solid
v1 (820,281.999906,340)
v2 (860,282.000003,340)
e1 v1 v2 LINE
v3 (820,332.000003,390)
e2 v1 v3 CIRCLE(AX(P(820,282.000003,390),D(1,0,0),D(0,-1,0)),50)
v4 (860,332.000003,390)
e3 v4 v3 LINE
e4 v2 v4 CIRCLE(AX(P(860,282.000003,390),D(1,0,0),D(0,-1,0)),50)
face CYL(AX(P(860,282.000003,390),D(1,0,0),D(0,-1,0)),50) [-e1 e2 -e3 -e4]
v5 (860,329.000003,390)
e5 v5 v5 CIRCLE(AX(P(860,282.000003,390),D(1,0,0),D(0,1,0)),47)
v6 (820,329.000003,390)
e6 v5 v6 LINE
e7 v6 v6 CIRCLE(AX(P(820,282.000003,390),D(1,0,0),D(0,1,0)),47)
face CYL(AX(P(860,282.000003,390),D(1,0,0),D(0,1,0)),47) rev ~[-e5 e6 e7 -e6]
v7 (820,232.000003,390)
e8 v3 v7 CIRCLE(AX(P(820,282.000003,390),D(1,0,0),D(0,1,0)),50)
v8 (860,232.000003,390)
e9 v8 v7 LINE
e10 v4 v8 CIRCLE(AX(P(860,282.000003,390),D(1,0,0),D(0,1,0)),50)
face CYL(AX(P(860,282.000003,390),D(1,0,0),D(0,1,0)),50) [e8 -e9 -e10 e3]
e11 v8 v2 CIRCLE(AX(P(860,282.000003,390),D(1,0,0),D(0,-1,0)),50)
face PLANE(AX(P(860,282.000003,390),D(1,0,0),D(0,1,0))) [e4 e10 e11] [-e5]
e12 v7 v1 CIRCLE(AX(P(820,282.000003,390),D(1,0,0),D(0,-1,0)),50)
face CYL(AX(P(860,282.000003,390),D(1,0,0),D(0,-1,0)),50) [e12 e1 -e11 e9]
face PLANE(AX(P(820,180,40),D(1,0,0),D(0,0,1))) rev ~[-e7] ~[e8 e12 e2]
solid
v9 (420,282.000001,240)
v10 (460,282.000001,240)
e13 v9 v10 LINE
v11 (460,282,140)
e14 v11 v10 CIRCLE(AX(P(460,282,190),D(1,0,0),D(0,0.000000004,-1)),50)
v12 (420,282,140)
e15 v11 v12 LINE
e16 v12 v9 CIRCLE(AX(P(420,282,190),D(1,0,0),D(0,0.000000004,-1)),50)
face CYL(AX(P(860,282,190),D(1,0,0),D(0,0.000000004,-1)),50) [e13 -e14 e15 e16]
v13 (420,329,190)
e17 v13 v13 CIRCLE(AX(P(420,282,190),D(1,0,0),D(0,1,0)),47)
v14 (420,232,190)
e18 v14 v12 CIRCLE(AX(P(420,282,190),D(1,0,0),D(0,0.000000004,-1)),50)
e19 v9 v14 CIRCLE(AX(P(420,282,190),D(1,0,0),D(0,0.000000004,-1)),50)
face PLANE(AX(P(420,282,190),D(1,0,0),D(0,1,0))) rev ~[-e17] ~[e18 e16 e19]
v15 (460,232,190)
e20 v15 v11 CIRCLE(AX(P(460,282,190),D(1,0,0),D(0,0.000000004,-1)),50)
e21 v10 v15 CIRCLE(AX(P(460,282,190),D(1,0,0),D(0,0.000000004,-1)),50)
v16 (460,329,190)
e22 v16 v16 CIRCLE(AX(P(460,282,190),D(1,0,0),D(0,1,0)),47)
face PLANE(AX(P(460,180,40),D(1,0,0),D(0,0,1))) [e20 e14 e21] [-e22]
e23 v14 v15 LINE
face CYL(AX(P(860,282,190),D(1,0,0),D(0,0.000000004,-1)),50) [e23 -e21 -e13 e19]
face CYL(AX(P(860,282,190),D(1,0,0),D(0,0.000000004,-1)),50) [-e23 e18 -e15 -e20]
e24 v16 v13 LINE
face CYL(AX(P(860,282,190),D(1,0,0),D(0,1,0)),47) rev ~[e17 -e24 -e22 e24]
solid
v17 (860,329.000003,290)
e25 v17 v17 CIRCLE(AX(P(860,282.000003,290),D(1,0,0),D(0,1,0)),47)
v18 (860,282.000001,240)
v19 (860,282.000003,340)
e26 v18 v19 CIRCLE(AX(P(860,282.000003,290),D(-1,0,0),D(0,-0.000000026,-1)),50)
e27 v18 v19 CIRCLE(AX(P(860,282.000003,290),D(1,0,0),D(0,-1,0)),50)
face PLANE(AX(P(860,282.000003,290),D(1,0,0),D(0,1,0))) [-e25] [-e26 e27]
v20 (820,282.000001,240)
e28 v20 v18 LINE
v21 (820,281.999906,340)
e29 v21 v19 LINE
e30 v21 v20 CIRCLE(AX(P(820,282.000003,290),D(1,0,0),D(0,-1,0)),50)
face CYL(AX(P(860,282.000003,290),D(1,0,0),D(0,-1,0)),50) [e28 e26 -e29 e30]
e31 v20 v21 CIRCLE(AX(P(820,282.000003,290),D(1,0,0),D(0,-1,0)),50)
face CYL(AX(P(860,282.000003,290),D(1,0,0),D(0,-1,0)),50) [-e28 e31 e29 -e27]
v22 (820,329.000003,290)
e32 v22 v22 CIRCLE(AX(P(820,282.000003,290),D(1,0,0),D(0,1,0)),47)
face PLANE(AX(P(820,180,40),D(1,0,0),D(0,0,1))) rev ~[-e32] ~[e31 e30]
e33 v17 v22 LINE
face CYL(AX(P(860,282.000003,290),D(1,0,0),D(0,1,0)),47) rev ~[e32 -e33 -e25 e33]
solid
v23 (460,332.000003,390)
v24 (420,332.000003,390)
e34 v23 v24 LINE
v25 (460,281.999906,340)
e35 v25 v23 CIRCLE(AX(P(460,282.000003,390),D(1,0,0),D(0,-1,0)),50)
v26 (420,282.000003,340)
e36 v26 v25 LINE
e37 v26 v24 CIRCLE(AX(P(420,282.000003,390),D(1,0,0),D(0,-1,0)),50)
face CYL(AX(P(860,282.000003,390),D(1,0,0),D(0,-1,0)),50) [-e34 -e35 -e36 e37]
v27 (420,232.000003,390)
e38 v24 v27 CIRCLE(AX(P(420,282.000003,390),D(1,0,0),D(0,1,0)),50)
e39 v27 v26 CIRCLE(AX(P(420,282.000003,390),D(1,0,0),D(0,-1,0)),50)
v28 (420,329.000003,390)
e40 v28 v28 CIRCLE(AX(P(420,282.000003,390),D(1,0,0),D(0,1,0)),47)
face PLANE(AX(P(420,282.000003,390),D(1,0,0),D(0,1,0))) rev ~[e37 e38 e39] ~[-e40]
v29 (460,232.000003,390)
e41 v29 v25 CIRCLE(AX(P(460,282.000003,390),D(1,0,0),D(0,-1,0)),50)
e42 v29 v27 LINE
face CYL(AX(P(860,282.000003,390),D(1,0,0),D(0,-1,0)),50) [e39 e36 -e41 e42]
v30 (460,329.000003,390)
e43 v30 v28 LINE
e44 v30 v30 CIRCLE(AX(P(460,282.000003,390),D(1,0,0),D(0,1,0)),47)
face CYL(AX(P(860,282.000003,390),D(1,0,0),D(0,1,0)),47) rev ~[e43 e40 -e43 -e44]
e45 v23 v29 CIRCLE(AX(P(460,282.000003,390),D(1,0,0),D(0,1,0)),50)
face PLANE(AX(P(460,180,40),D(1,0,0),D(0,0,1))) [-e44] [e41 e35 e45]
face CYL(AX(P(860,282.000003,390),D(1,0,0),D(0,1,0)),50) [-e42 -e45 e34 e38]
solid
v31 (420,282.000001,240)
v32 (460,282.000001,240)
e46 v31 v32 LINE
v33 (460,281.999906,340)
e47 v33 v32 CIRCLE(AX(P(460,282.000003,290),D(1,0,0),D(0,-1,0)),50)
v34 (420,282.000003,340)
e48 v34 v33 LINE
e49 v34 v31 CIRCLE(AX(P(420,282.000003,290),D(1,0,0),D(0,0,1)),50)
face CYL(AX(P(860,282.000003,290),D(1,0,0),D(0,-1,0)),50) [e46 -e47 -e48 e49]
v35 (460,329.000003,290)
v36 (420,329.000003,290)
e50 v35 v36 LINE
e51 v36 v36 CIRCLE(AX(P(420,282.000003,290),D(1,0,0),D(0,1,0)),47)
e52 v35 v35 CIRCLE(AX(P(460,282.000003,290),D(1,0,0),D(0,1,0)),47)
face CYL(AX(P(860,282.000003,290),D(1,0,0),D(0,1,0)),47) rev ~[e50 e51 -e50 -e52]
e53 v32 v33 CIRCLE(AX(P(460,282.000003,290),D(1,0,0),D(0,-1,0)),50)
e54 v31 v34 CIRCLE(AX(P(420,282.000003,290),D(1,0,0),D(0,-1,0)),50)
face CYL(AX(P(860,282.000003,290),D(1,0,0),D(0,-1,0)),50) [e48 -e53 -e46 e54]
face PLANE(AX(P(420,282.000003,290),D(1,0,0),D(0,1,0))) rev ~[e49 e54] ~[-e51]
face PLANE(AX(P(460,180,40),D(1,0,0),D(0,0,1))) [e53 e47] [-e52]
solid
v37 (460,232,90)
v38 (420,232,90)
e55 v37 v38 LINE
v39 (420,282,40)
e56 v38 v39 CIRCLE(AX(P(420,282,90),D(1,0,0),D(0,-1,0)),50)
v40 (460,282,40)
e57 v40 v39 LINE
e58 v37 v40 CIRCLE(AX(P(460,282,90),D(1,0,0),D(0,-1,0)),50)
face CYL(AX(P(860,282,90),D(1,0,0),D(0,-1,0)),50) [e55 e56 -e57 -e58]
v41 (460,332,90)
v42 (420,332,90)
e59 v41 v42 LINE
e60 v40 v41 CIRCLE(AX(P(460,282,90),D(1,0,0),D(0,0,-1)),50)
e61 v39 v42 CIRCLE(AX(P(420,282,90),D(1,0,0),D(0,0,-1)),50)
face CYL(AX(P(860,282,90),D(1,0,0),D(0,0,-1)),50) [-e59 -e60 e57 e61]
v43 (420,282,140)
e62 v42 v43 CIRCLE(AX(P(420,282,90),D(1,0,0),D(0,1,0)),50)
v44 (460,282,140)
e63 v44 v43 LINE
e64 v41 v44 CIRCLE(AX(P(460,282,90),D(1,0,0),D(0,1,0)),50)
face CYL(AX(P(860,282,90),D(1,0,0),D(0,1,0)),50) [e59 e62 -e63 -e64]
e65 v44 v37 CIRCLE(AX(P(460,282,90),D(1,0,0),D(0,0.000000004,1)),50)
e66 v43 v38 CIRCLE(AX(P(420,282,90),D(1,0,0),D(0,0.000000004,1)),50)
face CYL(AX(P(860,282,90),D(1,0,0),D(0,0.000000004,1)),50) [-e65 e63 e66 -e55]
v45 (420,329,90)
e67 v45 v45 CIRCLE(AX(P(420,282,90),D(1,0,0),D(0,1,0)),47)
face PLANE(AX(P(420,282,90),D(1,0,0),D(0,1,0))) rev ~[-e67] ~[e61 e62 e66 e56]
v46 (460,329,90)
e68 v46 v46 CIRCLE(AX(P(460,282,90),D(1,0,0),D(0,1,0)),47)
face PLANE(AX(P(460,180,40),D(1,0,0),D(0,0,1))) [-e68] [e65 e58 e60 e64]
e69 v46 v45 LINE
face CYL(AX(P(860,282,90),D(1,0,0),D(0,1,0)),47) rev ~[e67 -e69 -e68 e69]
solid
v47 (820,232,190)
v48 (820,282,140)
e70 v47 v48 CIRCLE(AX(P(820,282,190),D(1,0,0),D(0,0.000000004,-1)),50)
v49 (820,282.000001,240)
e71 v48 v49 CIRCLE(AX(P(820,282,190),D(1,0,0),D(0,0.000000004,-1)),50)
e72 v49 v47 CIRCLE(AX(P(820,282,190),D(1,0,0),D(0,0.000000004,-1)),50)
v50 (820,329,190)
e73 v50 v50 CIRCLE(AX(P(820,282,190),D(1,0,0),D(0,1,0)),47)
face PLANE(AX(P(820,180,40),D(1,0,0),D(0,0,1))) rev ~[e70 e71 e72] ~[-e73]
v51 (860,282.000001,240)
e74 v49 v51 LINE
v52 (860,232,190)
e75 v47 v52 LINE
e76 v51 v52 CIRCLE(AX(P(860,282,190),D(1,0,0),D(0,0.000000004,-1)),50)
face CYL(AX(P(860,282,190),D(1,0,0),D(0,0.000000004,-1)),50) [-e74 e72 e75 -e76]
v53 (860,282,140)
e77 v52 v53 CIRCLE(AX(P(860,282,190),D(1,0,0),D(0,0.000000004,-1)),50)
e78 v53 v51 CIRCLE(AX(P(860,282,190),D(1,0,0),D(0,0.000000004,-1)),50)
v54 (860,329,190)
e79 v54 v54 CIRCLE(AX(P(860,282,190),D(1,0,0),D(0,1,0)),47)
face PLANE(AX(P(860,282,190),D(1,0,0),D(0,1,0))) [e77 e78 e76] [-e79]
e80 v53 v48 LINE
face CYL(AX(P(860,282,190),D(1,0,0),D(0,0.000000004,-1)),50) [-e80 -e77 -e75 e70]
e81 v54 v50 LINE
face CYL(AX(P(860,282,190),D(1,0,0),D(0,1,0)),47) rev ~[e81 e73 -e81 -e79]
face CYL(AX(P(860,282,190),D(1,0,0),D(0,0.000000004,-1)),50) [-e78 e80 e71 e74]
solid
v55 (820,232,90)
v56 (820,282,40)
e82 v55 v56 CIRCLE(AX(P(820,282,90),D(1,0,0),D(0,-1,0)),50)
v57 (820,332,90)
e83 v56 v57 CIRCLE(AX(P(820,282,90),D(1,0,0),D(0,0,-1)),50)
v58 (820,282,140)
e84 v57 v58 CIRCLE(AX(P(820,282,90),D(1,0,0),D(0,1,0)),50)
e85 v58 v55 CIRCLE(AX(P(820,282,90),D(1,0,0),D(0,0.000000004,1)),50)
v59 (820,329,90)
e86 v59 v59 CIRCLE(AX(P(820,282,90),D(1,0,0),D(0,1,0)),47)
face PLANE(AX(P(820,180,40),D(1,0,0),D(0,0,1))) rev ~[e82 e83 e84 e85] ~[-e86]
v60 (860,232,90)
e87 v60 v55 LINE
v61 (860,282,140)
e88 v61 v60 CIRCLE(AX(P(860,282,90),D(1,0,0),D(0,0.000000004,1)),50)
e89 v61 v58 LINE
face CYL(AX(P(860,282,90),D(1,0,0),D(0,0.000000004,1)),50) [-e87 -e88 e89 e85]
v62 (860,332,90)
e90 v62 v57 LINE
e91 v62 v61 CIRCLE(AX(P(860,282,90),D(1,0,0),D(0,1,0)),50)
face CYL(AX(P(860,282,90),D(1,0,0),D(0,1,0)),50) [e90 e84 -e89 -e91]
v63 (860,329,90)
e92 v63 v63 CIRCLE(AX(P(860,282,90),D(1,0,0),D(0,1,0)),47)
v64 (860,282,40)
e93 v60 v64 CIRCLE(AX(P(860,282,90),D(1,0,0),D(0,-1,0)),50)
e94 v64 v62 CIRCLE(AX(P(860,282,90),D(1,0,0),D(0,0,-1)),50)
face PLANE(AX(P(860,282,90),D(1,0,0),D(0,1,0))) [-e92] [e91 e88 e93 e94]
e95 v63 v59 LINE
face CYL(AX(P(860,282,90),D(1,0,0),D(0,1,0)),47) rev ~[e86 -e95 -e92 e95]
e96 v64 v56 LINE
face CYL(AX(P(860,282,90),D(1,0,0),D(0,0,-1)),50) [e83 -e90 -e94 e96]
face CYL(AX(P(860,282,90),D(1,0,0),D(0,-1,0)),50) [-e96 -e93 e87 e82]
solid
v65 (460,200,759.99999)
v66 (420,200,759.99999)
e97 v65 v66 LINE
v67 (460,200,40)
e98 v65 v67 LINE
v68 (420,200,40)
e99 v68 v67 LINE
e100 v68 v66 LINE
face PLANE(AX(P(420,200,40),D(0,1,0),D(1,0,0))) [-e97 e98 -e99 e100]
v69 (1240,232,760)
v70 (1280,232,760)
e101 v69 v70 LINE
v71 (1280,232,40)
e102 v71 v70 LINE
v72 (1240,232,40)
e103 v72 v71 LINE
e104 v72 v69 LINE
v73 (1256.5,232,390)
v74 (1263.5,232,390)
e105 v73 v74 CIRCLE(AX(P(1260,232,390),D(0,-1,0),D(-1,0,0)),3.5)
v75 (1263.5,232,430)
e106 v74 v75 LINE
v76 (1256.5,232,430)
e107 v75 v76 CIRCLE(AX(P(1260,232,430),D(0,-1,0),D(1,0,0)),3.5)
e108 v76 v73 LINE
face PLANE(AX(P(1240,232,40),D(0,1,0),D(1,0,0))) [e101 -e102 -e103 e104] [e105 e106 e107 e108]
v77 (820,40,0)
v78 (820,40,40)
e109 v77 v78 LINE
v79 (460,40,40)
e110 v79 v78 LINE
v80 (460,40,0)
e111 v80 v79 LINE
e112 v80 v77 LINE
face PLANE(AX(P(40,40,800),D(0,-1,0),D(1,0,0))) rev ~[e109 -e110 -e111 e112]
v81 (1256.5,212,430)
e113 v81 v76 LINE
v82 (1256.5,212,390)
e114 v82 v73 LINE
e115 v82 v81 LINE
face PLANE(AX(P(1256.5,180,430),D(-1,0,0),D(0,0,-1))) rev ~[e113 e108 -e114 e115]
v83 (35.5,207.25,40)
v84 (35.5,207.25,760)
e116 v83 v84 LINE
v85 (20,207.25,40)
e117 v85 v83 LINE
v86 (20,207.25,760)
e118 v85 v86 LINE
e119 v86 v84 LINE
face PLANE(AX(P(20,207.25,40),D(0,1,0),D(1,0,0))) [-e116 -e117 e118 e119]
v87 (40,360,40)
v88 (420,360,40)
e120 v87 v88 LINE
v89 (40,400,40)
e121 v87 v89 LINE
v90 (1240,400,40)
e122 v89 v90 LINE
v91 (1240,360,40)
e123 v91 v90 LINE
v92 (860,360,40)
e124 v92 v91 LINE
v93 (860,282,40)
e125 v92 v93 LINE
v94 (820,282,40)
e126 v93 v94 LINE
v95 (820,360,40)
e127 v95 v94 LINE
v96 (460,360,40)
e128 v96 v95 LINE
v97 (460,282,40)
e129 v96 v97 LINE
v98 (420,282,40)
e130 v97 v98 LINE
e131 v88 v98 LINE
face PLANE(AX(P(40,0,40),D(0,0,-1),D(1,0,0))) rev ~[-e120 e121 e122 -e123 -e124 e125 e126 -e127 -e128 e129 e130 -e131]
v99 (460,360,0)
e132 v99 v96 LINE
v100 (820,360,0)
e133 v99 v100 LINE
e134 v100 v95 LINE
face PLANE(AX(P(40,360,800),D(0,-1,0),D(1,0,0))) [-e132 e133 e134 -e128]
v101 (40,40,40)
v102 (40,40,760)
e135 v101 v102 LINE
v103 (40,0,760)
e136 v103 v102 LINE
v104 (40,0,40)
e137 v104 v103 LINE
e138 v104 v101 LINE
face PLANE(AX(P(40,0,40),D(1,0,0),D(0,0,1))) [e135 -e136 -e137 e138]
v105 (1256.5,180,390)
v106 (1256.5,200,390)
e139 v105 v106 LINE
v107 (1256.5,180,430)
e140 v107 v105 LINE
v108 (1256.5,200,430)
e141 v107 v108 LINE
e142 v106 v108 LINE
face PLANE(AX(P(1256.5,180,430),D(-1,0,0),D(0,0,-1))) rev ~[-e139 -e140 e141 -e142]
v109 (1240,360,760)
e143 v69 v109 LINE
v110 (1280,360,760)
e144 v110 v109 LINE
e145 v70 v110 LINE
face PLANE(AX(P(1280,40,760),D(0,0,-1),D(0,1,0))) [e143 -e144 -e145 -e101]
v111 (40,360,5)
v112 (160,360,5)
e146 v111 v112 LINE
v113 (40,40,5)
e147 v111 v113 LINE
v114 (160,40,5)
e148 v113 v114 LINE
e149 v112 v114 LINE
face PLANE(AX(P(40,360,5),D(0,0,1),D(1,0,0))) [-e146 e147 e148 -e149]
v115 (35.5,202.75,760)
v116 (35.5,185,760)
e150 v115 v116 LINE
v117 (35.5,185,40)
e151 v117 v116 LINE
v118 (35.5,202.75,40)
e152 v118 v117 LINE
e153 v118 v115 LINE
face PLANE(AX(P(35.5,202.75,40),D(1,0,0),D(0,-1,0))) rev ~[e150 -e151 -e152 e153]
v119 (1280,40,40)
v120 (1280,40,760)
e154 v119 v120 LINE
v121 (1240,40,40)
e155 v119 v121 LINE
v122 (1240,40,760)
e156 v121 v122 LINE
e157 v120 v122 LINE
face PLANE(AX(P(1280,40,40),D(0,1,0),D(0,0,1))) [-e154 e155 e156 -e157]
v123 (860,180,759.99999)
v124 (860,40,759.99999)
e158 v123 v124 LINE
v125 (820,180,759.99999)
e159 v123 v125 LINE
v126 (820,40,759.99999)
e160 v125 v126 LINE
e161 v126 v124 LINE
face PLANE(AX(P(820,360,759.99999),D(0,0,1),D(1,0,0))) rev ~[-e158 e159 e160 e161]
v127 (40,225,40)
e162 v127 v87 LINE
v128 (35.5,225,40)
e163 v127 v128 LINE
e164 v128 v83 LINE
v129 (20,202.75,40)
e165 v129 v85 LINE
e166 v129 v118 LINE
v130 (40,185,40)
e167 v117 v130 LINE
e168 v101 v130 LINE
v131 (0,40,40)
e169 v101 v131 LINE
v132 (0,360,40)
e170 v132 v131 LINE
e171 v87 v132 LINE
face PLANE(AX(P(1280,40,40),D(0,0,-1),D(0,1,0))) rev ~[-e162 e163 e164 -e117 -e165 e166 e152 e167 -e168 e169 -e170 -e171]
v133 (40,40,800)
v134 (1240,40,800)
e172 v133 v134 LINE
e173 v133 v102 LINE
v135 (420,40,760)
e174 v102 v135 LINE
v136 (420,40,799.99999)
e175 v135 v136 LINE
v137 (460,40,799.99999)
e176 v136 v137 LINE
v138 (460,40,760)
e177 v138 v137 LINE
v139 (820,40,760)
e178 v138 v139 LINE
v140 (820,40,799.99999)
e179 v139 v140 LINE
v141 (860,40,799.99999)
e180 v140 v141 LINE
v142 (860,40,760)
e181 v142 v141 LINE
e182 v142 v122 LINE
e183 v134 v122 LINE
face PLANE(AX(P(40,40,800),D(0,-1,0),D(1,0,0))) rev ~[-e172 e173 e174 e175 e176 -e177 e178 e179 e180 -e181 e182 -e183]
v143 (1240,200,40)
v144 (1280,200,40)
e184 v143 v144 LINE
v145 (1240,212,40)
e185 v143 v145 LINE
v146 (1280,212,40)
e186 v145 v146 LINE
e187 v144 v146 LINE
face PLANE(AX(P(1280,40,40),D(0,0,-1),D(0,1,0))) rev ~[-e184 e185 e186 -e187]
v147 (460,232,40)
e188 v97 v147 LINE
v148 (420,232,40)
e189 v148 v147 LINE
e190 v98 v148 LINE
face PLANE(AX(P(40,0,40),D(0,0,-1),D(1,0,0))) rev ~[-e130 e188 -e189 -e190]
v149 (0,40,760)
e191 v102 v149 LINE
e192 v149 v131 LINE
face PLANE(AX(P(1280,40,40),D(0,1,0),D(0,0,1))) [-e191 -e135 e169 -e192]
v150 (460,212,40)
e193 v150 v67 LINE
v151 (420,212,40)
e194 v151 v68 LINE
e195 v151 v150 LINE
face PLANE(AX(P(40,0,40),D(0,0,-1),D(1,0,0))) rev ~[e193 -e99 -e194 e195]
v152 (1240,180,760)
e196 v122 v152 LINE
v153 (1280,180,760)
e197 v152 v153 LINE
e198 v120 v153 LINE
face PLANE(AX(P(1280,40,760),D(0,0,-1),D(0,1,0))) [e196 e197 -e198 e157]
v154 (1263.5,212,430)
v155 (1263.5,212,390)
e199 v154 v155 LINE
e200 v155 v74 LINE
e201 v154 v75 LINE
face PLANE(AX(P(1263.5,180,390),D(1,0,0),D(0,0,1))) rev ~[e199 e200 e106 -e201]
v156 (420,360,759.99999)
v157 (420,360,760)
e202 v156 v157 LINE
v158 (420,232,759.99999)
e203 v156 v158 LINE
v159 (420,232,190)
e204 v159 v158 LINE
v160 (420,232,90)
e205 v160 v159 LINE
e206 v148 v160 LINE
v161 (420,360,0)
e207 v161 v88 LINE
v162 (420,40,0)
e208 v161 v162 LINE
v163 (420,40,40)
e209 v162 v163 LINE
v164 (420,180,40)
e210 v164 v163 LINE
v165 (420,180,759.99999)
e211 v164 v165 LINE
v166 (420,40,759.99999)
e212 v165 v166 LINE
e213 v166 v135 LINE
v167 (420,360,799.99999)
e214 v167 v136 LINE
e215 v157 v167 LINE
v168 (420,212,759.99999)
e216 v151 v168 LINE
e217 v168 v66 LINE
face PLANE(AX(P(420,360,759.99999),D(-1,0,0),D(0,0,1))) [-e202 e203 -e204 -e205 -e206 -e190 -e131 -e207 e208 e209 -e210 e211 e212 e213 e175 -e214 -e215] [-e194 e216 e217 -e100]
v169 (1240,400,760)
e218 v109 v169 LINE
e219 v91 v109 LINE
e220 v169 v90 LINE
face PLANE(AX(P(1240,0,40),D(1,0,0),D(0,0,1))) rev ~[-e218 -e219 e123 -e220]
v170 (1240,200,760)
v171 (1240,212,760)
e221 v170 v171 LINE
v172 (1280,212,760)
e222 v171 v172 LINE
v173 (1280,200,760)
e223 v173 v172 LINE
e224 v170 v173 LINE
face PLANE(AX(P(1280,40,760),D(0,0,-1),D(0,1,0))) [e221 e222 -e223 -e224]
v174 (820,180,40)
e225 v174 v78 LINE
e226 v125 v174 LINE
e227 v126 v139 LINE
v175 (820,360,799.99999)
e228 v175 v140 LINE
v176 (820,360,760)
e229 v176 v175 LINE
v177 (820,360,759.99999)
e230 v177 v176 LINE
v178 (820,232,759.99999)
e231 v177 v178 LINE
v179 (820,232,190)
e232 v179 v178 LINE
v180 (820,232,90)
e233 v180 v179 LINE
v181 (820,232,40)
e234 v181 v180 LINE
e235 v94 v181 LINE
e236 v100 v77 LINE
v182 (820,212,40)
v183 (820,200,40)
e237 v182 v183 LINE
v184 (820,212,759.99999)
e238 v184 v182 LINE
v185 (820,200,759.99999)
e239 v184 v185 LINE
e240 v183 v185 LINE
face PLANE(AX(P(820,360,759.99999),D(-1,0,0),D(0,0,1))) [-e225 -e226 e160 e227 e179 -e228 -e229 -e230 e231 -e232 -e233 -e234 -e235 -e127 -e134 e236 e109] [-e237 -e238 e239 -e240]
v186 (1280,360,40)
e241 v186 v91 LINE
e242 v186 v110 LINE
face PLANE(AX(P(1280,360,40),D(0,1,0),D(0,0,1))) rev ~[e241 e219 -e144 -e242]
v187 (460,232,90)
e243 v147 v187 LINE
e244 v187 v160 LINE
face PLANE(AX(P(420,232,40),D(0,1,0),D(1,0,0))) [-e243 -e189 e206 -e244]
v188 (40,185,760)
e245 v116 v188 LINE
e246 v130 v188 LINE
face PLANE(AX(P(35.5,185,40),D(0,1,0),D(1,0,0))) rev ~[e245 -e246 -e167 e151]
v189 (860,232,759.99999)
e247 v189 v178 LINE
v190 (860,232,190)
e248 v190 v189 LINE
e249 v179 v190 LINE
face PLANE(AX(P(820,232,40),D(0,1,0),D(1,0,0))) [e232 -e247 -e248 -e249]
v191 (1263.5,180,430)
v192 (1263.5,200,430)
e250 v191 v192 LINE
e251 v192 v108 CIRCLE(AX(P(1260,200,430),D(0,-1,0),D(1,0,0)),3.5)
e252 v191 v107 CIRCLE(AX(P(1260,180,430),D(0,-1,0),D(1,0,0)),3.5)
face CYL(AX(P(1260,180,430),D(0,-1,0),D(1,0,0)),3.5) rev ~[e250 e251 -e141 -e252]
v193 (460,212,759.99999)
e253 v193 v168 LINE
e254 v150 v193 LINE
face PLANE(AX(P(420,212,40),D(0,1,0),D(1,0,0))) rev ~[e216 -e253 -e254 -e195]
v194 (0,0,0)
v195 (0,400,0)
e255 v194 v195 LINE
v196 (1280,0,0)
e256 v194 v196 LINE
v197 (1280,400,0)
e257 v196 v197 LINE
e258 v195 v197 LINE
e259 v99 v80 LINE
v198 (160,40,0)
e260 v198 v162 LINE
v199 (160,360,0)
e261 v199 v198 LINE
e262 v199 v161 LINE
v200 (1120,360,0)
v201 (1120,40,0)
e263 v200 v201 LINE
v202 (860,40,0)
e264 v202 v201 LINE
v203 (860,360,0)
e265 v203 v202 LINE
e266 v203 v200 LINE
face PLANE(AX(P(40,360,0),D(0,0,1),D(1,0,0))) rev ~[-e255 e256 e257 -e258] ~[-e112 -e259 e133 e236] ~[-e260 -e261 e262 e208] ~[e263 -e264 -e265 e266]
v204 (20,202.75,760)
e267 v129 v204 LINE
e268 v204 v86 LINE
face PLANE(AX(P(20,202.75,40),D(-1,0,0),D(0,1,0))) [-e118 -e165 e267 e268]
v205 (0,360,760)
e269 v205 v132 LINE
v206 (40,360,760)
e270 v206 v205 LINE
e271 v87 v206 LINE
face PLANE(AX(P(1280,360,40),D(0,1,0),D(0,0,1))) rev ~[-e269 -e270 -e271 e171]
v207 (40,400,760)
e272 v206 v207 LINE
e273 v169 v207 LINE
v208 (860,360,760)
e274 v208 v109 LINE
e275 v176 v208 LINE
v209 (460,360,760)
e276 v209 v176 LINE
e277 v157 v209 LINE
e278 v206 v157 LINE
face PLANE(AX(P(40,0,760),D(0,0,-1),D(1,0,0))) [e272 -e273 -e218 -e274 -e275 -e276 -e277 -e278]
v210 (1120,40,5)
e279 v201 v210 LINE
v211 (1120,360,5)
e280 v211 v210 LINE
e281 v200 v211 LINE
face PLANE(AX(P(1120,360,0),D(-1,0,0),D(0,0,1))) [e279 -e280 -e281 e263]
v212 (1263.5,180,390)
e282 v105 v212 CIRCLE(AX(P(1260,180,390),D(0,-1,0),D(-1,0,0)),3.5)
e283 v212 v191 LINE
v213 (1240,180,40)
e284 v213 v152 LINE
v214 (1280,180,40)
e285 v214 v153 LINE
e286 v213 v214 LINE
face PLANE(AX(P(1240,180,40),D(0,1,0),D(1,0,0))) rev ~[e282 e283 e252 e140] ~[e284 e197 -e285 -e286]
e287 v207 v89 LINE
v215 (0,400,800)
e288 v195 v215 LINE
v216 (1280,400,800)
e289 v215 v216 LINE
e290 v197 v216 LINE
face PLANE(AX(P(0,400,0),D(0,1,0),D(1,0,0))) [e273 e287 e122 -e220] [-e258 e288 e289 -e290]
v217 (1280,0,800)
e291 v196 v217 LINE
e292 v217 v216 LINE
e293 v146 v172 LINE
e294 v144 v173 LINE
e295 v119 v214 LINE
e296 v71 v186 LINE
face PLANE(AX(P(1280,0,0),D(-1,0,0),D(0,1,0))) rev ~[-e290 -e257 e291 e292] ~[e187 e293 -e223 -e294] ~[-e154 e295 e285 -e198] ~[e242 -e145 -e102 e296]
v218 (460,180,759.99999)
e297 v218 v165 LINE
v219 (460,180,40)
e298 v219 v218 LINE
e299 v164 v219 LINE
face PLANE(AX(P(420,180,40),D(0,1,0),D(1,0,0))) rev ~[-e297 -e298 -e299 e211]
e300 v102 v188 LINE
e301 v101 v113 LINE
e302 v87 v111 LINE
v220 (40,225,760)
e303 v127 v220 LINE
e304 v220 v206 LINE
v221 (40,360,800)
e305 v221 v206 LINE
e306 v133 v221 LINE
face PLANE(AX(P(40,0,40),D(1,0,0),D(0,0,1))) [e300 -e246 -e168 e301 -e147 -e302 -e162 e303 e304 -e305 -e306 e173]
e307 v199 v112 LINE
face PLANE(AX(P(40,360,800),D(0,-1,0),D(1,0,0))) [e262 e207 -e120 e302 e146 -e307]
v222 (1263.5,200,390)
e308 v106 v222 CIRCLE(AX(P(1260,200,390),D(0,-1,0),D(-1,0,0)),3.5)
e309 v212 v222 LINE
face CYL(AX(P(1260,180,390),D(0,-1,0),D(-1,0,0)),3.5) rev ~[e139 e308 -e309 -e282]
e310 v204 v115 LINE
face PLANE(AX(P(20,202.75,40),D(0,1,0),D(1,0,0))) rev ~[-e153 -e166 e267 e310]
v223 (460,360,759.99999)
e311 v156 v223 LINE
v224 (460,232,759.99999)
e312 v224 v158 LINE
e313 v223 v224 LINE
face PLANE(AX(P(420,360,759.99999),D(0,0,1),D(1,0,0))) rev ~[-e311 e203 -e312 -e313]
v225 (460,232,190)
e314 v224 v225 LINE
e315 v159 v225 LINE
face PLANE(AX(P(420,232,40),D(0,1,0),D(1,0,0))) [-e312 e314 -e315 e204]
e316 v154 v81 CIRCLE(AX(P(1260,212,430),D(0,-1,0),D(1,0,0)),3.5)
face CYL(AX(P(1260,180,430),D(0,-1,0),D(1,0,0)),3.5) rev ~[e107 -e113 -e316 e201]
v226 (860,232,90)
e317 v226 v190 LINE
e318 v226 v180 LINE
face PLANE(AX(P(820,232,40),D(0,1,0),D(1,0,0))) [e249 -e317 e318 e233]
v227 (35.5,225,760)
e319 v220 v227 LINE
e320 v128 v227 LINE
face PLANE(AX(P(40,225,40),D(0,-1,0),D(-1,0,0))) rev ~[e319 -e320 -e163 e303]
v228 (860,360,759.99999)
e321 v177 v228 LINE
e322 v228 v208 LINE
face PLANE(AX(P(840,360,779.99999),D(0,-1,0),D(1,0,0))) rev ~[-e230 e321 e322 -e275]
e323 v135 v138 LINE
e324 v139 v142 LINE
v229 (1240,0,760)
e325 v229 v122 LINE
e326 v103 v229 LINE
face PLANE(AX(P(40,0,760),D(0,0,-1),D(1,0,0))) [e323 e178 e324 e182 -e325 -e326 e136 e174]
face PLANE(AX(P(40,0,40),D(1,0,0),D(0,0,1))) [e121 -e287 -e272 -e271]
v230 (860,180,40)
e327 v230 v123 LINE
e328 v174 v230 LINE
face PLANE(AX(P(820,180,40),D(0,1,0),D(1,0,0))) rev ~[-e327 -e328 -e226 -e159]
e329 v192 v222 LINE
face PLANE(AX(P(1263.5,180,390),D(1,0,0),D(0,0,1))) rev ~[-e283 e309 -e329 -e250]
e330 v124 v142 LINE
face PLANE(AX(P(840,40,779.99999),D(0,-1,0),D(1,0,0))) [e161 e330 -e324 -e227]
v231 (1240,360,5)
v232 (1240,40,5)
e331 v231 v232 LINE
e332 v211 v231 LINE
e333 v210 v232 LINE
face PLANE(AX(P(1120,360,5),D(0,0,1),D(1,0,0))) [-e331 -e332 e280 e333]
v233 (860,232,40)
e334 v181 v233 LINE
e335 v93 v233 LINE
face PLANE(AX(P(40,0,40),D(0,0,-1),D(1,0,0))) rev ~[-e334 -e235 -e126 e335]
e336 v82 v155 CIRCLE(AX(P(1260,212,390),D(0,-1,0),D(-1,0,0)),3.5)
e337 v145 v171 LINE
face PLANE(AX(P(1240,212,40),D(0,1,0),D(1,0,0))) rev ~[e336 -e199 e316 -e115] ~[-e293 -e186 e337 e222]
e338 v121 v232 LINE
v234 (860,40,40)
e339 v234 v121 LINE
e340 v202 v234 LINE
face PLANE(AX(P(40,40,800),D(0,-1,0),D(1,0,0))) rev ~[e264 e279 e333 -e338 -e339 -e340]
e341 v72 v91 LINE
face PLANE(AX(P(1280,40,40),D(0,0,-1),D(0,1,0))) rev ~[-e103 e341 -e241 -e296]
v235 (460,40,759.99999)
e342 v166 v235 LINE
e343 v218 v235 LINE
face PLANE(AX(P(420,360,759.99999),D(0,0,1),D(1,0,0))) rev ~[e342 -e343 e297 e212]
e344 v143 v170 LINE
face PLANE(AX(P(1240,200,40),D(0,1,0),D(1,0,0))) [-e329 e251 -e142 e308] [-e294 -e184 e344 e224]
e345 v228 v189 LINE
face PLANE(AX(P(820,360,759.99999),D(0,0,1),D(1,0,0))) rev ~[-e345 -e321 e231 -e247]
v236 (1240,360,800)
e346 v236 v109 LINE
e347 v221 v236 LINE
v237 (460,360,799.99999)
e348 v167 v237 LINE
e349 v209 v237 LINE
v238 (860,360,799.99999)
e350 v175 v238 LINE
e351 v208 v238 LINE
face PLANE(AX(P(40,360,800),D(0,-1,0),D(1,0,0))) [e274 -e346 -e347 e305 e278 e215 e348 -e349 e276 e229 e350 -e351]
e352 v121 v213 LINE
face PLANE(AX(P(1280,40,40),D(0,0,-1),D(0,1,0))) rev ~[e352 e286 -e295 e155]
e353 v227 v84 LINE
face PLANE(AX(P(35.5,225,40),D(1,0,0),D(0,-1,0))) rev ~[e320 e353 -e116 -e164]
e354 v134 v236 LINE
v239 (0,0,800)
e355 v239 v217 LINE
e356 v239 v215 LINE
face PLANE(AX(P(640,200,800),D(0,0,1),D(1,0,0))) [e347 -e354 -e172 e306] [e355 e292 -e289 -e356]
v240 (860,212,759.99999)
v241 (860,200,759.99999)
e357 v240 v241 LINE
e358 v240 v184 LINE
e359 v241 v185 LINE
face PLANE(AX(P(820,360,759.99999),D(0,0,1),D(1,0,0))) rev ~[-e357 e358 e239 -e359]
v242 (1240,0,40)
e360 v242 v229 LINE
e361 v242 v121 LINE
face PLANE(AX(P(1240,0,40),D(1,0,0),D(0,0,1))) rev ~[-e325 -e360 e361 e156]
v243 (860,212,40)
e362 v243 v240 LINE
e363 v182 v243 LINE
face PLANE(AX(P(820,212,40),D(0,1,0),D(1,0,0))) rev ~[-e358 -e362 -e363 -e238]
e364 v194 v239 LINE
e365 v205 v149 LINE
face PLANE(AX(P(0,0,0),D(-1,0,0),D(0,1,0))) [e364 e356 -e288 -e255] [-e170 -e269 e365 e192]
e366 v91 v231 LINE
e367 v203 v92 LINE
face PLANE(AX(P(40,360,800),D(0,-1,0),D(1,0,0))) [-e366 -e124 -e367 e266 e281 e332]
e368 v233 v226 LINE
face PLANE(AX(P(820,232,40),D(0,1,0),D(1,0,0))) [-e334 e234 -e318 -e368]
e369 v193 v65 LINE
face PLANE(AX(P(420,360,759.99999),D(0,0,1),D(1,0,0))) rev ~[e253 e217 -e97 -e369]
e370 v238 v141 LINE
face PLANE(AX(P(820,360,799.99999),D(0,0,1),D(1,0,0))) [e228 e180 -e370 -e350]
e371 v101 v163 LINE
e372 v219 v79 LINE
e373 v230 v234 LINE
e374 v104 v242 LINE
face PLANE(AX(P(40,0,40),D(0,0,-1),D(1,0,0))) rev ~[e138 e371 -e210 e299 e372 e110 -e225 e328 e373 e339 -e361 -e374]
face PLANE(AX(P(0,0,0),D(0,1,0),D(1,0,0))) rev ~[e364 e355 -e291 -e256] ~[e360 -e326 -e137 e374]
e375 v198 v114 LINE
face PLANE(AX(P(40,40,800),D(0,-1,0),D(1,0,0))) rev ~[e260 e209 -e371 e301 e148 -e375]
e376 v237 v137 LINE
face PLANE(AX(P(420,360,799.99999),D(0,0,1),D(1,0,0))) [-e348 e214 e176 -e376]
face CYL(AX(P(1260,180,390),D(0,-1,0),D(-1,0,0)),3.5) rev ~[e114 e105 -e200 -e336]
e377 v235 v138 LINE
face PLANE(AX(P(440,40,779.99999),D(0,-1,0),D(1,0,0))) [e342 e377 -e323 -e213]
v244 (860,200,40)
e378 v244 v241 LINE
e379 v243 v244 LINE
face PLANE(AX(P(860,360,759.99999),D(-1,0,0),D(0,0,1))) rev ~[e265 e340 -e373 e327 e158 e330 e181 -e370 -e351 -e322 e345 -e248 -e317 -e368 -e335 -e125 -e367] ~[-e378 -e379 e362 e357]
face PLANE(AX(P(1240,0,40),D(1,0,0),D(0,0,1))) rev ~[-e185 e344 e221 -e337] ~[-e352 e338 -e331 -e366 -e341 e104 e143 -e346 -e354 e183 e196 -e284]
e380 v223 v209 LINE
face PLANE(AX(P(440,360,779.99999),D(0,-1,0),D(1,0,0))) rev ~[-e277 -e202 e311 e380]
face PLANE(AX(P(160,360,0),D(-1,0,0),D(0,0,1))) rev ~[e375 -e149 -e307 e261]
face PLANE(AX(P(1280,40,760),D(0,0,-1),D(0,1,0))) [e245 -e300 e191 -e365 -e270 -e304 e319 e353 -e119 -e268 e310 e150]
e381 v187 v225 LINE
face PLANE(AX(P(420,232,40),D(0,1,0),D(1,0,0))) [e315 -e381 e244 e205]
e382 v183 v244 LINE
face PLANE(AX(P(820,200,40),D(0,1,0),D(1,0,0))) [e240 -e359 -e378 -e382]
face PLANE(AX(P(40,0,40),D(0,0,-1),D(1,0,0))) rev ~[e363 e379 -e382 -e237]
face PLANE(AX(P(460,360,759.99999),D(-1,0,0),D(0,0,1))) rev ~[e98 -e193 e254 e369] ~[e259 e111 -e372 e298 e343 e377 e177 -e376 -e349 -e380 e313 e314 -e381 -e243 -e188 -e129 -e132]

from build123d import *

# Parameters (mm, degrees)
F0_W      = 1280
F0_H      = 400
F1_DEPTH  = 800
F2_W      = 1200
F2_H      = 320
F3_DEPTH  = 800.001
F4_W      = 1200
F4_H      = 720
F5_DEPTH  = 400.001
F6_W      = 320
F6_H      = 720
F7_DEPTH  = 1280.001
F8_W      = 40
F8_H      = 40
F9_DEPTH  = 320
F10_W     = 40
F10_H     = 40
F11_DEPTH = 320
F12_W     = 40
F12_H     = 20
F12_W_2   = 15.5
F12_H_2   = 4.5
F14_R     = 47
F15_DEPTH = 440
F16_W     = 360
F16_H     = 430
F17_DEPTH = 220.001
F18_W     = 120
F18_H     = 5
F19_DEPTH = 320
F20_W     = 40
F20_H     = 20
F21_DEPTH = 720
F23_DEPTH = 52


with BuildPart() as f1:
    # F0 (on Top) → F1 (new body)
    with BuildSketch(Plane.XY):
        with Locations((640, 200)):
            Rectangle(F0_W, F0_H)
    extrude(amount=F1_DEPTH)

    # F2 (on face) → F3 (cut, through all)
    with BuildSketch(Plane.XY.offset(800)):
        with Locations((640, 200)):
            Rectangle(F2_W, F2_H)
    extrude(amount=-F3_DEPTH, mode=Mode.SUBTRACT)

    # F4 (on face) → F5 (cut, through all)
    with BuildSketch(Plane.XZ):
        with Locations((640, 400)):
            Rectangle(F4_W, F4_H)
    extrude(amount=-F5_DEPTH, mode=Mode.SUBTRACT)

    # F6 (on face) → F7 (cut, through all)
    with BuildSketch(Plane.YZ.offset(1280)):
        with Locations((200, 400)):
            Rectangle(F6_W, F6_H)
    extrude(amount=-F7_DEPTH, mode=Mode.SUBTRACT)

    # F8 (on face) → F9 (join, through all)
    with BuildSketch(Plane.XZ.offset(-360)):
        with Locations((440, 20)):
            Rectangle(F8_W, F8_H)
        with Locations((840, 20)):
            Rectangle(F8_W, F8_H)
    extrude(amount=F9_DEPTH)

    # F10 (on face) → F11 (join, through all)
    with BuildSketch(Plane.XZ.offset(-360)):
        with Locations((440, 779.9999904633)):
            Rectangle(F10_W, F10_H)
        with Locations((840, 779.9999904633)):
            Rectangle(F10_W, F10_H)
    extrude(amount=F11_DEPTH)

    # F12 (on face) → F13 (join, up to the next surface of F1)
    with BuildSketch(Plane.XY.offset(40)):
        with Locations((440, 190)):
            Rectangle(F12_W, F12_H)
        with Locations((840, 222)):
            Rectangle(F12_W, F12_H)
        with Locations((840, 190)):
            Rectangle(F12_W, F12_H)
        with Locations((440, 222)):
            Rectangle(F12_W, F12_H)
        with Locations((27.75, 205)):
            Rectangle(F12_W_2, F12_H_2)
        Polygon((40, 185), (40, 225), (35.5, 225), (35.5, 207.25), (35.5, 202.75), (35.5, 185), align=None)
    extrude(until=Until.NEXT)



with BuildPart() as f15:
    # F14 (on face) → F15 (new body)
    with BuildSketch(Plane.YZ.offset(860)):
        with BuildLine():
            ThreePointArc((232.0000026226, 390), (246.6446635633, 354.6446609407), (282.0000026227, 340))
            ThreePointArc((282.0000026227, 340), (317.355341682, 354.6446609407), (332.0000026226, 390))
            ThreePointArc((332.0000026226, 390), (282.0000026226, 440), (232.0000026226, 390))
        make_face()
        with Locations((282.0000026226, 390)):
            Circle(F14_R, mode=Mode.SUBTRACT)
    extrude(amount=-F15_DEPTH)

    # F14 (on face) → F15, piece 2 (join)
    with BuildSketch(Plane.YZ.offset(860)):
        with BuildLine():
            ThreePointArc((232.0000026226, 290), (246.6446630019, 254.6446615021), (282.0000010347, 240))
            ThreePointArc((282.0000010347, 240), (317.3553411205, 254.6446603792), (332.0000026226, 290))
            ThreePointArc((332.0000026226, 290), (317.355341682, 325.3553390593), (282.0000026227, 340))
            ThreePointArc((282.0000026227, 340), (246.6446635633, 325.3553390593), (232.0000026226, 290))
        make_face()
        with Locations((282.0000026226, 290)):
            Circle(F14_R, mode=Mode.SUBTRACT)
    extrude(amount=-F15_DEPTH)


with BuildPart() as f1_1:
    add(f1.part)

    add(f15.part)  # F15#3 merges F15
    # F14 (on face) → F15, piece 3 (join)
    with BuildSketch(Plane.YZ.offset(860)):
        with BuildLine():
            ThreePointArc((232, 189.9999997472), (246.6446610932, 154.6446607881), (282.0000001788, 140))
            ThreePointArc((282.0000001788, 140), (317.3553391225, 154.6446610039), (332, 190))
            ThreePointArc((332, 190), (317.3553394251, 225.3553386935), (282.0000010347, 240))
            ThreePointArc((282.0000010347, 240), (246.6446612171, 225.3553393358), (232, 189.9999997472))
        make_face()
        with Locations((282, 190)):
            Circle(F14_R, mode=Mode.SUBTRACT)
        with BuildLine():
            ThreePointArc((282, 40), (317.3553390593, 54.6446609407), (332, 90))
            ThreePointArc((332, 90), (317.3553391225, 125.3553389961), (282.0000001788, 140))
            ThreePointArc((282.0000001788, 140), (246.6446610039, 125.3553391225), (232, 90))
            ThreePointArc((232, 90), (246.6446609407, 54.6446609407), (282, 40))
        make_face()
        with Locations((282, 90)):
            Circle(F14_R, mode=Mode.SUBTRACT)
    extrude(amount=-F15_DEPTH)

    # F16 (on face) → F17 (cut, through all)
    with BuildSketch(Plane.XZ.offset(-180)):
        with Locations((640, 255)):
            Rectangle(F16_W, F16_H)
    extrude(amount=-F17_DEPTH, mode=Mode.SUBTRACT)

    # F18 (on face) → F19 (join, through all)
    with BuildSketch(Plane.XZ.offset(-360)):
        with Locations((100, 2.5)):
            Rectangle(F18_W, F18_H)
        with Locations((1180, 2.5)):
            Rectangle(F18_W, F18_H)
    extrude(amount=F19_DEPTH)

    # F20 (on face) → F21 (join, through all)
    with BuildSketch(Plane.XY.offset(40)):
        with Locations((1260, 190)):
            Rectangle(F20_W, F20_H)
        with Locations((1260, 222)):
            Rectangle(F20_W, F20_H)
    extrude(amount=F21_DEPTH)

    # F22 (on face) → F23 (cut, through all)
    with BuildSketch(Plane.XZ.offset(-180)):
        with BuildLine():
            Line((1256.5, 430), (1256.5, 390))
            ThreePointArc((1256.5, 390), (1260, 386.5), (1263.5, 390))
            Line((1263.5, 390), (1263.5, 430))
            ThreePointArc((1263.5, 430), (1260, 433.5), (1256.5, 430))
        make_face()
    extrude(amount=-F23_DEPTH, mode=Mode.SUBTRACT)


solid = f1_1.part
